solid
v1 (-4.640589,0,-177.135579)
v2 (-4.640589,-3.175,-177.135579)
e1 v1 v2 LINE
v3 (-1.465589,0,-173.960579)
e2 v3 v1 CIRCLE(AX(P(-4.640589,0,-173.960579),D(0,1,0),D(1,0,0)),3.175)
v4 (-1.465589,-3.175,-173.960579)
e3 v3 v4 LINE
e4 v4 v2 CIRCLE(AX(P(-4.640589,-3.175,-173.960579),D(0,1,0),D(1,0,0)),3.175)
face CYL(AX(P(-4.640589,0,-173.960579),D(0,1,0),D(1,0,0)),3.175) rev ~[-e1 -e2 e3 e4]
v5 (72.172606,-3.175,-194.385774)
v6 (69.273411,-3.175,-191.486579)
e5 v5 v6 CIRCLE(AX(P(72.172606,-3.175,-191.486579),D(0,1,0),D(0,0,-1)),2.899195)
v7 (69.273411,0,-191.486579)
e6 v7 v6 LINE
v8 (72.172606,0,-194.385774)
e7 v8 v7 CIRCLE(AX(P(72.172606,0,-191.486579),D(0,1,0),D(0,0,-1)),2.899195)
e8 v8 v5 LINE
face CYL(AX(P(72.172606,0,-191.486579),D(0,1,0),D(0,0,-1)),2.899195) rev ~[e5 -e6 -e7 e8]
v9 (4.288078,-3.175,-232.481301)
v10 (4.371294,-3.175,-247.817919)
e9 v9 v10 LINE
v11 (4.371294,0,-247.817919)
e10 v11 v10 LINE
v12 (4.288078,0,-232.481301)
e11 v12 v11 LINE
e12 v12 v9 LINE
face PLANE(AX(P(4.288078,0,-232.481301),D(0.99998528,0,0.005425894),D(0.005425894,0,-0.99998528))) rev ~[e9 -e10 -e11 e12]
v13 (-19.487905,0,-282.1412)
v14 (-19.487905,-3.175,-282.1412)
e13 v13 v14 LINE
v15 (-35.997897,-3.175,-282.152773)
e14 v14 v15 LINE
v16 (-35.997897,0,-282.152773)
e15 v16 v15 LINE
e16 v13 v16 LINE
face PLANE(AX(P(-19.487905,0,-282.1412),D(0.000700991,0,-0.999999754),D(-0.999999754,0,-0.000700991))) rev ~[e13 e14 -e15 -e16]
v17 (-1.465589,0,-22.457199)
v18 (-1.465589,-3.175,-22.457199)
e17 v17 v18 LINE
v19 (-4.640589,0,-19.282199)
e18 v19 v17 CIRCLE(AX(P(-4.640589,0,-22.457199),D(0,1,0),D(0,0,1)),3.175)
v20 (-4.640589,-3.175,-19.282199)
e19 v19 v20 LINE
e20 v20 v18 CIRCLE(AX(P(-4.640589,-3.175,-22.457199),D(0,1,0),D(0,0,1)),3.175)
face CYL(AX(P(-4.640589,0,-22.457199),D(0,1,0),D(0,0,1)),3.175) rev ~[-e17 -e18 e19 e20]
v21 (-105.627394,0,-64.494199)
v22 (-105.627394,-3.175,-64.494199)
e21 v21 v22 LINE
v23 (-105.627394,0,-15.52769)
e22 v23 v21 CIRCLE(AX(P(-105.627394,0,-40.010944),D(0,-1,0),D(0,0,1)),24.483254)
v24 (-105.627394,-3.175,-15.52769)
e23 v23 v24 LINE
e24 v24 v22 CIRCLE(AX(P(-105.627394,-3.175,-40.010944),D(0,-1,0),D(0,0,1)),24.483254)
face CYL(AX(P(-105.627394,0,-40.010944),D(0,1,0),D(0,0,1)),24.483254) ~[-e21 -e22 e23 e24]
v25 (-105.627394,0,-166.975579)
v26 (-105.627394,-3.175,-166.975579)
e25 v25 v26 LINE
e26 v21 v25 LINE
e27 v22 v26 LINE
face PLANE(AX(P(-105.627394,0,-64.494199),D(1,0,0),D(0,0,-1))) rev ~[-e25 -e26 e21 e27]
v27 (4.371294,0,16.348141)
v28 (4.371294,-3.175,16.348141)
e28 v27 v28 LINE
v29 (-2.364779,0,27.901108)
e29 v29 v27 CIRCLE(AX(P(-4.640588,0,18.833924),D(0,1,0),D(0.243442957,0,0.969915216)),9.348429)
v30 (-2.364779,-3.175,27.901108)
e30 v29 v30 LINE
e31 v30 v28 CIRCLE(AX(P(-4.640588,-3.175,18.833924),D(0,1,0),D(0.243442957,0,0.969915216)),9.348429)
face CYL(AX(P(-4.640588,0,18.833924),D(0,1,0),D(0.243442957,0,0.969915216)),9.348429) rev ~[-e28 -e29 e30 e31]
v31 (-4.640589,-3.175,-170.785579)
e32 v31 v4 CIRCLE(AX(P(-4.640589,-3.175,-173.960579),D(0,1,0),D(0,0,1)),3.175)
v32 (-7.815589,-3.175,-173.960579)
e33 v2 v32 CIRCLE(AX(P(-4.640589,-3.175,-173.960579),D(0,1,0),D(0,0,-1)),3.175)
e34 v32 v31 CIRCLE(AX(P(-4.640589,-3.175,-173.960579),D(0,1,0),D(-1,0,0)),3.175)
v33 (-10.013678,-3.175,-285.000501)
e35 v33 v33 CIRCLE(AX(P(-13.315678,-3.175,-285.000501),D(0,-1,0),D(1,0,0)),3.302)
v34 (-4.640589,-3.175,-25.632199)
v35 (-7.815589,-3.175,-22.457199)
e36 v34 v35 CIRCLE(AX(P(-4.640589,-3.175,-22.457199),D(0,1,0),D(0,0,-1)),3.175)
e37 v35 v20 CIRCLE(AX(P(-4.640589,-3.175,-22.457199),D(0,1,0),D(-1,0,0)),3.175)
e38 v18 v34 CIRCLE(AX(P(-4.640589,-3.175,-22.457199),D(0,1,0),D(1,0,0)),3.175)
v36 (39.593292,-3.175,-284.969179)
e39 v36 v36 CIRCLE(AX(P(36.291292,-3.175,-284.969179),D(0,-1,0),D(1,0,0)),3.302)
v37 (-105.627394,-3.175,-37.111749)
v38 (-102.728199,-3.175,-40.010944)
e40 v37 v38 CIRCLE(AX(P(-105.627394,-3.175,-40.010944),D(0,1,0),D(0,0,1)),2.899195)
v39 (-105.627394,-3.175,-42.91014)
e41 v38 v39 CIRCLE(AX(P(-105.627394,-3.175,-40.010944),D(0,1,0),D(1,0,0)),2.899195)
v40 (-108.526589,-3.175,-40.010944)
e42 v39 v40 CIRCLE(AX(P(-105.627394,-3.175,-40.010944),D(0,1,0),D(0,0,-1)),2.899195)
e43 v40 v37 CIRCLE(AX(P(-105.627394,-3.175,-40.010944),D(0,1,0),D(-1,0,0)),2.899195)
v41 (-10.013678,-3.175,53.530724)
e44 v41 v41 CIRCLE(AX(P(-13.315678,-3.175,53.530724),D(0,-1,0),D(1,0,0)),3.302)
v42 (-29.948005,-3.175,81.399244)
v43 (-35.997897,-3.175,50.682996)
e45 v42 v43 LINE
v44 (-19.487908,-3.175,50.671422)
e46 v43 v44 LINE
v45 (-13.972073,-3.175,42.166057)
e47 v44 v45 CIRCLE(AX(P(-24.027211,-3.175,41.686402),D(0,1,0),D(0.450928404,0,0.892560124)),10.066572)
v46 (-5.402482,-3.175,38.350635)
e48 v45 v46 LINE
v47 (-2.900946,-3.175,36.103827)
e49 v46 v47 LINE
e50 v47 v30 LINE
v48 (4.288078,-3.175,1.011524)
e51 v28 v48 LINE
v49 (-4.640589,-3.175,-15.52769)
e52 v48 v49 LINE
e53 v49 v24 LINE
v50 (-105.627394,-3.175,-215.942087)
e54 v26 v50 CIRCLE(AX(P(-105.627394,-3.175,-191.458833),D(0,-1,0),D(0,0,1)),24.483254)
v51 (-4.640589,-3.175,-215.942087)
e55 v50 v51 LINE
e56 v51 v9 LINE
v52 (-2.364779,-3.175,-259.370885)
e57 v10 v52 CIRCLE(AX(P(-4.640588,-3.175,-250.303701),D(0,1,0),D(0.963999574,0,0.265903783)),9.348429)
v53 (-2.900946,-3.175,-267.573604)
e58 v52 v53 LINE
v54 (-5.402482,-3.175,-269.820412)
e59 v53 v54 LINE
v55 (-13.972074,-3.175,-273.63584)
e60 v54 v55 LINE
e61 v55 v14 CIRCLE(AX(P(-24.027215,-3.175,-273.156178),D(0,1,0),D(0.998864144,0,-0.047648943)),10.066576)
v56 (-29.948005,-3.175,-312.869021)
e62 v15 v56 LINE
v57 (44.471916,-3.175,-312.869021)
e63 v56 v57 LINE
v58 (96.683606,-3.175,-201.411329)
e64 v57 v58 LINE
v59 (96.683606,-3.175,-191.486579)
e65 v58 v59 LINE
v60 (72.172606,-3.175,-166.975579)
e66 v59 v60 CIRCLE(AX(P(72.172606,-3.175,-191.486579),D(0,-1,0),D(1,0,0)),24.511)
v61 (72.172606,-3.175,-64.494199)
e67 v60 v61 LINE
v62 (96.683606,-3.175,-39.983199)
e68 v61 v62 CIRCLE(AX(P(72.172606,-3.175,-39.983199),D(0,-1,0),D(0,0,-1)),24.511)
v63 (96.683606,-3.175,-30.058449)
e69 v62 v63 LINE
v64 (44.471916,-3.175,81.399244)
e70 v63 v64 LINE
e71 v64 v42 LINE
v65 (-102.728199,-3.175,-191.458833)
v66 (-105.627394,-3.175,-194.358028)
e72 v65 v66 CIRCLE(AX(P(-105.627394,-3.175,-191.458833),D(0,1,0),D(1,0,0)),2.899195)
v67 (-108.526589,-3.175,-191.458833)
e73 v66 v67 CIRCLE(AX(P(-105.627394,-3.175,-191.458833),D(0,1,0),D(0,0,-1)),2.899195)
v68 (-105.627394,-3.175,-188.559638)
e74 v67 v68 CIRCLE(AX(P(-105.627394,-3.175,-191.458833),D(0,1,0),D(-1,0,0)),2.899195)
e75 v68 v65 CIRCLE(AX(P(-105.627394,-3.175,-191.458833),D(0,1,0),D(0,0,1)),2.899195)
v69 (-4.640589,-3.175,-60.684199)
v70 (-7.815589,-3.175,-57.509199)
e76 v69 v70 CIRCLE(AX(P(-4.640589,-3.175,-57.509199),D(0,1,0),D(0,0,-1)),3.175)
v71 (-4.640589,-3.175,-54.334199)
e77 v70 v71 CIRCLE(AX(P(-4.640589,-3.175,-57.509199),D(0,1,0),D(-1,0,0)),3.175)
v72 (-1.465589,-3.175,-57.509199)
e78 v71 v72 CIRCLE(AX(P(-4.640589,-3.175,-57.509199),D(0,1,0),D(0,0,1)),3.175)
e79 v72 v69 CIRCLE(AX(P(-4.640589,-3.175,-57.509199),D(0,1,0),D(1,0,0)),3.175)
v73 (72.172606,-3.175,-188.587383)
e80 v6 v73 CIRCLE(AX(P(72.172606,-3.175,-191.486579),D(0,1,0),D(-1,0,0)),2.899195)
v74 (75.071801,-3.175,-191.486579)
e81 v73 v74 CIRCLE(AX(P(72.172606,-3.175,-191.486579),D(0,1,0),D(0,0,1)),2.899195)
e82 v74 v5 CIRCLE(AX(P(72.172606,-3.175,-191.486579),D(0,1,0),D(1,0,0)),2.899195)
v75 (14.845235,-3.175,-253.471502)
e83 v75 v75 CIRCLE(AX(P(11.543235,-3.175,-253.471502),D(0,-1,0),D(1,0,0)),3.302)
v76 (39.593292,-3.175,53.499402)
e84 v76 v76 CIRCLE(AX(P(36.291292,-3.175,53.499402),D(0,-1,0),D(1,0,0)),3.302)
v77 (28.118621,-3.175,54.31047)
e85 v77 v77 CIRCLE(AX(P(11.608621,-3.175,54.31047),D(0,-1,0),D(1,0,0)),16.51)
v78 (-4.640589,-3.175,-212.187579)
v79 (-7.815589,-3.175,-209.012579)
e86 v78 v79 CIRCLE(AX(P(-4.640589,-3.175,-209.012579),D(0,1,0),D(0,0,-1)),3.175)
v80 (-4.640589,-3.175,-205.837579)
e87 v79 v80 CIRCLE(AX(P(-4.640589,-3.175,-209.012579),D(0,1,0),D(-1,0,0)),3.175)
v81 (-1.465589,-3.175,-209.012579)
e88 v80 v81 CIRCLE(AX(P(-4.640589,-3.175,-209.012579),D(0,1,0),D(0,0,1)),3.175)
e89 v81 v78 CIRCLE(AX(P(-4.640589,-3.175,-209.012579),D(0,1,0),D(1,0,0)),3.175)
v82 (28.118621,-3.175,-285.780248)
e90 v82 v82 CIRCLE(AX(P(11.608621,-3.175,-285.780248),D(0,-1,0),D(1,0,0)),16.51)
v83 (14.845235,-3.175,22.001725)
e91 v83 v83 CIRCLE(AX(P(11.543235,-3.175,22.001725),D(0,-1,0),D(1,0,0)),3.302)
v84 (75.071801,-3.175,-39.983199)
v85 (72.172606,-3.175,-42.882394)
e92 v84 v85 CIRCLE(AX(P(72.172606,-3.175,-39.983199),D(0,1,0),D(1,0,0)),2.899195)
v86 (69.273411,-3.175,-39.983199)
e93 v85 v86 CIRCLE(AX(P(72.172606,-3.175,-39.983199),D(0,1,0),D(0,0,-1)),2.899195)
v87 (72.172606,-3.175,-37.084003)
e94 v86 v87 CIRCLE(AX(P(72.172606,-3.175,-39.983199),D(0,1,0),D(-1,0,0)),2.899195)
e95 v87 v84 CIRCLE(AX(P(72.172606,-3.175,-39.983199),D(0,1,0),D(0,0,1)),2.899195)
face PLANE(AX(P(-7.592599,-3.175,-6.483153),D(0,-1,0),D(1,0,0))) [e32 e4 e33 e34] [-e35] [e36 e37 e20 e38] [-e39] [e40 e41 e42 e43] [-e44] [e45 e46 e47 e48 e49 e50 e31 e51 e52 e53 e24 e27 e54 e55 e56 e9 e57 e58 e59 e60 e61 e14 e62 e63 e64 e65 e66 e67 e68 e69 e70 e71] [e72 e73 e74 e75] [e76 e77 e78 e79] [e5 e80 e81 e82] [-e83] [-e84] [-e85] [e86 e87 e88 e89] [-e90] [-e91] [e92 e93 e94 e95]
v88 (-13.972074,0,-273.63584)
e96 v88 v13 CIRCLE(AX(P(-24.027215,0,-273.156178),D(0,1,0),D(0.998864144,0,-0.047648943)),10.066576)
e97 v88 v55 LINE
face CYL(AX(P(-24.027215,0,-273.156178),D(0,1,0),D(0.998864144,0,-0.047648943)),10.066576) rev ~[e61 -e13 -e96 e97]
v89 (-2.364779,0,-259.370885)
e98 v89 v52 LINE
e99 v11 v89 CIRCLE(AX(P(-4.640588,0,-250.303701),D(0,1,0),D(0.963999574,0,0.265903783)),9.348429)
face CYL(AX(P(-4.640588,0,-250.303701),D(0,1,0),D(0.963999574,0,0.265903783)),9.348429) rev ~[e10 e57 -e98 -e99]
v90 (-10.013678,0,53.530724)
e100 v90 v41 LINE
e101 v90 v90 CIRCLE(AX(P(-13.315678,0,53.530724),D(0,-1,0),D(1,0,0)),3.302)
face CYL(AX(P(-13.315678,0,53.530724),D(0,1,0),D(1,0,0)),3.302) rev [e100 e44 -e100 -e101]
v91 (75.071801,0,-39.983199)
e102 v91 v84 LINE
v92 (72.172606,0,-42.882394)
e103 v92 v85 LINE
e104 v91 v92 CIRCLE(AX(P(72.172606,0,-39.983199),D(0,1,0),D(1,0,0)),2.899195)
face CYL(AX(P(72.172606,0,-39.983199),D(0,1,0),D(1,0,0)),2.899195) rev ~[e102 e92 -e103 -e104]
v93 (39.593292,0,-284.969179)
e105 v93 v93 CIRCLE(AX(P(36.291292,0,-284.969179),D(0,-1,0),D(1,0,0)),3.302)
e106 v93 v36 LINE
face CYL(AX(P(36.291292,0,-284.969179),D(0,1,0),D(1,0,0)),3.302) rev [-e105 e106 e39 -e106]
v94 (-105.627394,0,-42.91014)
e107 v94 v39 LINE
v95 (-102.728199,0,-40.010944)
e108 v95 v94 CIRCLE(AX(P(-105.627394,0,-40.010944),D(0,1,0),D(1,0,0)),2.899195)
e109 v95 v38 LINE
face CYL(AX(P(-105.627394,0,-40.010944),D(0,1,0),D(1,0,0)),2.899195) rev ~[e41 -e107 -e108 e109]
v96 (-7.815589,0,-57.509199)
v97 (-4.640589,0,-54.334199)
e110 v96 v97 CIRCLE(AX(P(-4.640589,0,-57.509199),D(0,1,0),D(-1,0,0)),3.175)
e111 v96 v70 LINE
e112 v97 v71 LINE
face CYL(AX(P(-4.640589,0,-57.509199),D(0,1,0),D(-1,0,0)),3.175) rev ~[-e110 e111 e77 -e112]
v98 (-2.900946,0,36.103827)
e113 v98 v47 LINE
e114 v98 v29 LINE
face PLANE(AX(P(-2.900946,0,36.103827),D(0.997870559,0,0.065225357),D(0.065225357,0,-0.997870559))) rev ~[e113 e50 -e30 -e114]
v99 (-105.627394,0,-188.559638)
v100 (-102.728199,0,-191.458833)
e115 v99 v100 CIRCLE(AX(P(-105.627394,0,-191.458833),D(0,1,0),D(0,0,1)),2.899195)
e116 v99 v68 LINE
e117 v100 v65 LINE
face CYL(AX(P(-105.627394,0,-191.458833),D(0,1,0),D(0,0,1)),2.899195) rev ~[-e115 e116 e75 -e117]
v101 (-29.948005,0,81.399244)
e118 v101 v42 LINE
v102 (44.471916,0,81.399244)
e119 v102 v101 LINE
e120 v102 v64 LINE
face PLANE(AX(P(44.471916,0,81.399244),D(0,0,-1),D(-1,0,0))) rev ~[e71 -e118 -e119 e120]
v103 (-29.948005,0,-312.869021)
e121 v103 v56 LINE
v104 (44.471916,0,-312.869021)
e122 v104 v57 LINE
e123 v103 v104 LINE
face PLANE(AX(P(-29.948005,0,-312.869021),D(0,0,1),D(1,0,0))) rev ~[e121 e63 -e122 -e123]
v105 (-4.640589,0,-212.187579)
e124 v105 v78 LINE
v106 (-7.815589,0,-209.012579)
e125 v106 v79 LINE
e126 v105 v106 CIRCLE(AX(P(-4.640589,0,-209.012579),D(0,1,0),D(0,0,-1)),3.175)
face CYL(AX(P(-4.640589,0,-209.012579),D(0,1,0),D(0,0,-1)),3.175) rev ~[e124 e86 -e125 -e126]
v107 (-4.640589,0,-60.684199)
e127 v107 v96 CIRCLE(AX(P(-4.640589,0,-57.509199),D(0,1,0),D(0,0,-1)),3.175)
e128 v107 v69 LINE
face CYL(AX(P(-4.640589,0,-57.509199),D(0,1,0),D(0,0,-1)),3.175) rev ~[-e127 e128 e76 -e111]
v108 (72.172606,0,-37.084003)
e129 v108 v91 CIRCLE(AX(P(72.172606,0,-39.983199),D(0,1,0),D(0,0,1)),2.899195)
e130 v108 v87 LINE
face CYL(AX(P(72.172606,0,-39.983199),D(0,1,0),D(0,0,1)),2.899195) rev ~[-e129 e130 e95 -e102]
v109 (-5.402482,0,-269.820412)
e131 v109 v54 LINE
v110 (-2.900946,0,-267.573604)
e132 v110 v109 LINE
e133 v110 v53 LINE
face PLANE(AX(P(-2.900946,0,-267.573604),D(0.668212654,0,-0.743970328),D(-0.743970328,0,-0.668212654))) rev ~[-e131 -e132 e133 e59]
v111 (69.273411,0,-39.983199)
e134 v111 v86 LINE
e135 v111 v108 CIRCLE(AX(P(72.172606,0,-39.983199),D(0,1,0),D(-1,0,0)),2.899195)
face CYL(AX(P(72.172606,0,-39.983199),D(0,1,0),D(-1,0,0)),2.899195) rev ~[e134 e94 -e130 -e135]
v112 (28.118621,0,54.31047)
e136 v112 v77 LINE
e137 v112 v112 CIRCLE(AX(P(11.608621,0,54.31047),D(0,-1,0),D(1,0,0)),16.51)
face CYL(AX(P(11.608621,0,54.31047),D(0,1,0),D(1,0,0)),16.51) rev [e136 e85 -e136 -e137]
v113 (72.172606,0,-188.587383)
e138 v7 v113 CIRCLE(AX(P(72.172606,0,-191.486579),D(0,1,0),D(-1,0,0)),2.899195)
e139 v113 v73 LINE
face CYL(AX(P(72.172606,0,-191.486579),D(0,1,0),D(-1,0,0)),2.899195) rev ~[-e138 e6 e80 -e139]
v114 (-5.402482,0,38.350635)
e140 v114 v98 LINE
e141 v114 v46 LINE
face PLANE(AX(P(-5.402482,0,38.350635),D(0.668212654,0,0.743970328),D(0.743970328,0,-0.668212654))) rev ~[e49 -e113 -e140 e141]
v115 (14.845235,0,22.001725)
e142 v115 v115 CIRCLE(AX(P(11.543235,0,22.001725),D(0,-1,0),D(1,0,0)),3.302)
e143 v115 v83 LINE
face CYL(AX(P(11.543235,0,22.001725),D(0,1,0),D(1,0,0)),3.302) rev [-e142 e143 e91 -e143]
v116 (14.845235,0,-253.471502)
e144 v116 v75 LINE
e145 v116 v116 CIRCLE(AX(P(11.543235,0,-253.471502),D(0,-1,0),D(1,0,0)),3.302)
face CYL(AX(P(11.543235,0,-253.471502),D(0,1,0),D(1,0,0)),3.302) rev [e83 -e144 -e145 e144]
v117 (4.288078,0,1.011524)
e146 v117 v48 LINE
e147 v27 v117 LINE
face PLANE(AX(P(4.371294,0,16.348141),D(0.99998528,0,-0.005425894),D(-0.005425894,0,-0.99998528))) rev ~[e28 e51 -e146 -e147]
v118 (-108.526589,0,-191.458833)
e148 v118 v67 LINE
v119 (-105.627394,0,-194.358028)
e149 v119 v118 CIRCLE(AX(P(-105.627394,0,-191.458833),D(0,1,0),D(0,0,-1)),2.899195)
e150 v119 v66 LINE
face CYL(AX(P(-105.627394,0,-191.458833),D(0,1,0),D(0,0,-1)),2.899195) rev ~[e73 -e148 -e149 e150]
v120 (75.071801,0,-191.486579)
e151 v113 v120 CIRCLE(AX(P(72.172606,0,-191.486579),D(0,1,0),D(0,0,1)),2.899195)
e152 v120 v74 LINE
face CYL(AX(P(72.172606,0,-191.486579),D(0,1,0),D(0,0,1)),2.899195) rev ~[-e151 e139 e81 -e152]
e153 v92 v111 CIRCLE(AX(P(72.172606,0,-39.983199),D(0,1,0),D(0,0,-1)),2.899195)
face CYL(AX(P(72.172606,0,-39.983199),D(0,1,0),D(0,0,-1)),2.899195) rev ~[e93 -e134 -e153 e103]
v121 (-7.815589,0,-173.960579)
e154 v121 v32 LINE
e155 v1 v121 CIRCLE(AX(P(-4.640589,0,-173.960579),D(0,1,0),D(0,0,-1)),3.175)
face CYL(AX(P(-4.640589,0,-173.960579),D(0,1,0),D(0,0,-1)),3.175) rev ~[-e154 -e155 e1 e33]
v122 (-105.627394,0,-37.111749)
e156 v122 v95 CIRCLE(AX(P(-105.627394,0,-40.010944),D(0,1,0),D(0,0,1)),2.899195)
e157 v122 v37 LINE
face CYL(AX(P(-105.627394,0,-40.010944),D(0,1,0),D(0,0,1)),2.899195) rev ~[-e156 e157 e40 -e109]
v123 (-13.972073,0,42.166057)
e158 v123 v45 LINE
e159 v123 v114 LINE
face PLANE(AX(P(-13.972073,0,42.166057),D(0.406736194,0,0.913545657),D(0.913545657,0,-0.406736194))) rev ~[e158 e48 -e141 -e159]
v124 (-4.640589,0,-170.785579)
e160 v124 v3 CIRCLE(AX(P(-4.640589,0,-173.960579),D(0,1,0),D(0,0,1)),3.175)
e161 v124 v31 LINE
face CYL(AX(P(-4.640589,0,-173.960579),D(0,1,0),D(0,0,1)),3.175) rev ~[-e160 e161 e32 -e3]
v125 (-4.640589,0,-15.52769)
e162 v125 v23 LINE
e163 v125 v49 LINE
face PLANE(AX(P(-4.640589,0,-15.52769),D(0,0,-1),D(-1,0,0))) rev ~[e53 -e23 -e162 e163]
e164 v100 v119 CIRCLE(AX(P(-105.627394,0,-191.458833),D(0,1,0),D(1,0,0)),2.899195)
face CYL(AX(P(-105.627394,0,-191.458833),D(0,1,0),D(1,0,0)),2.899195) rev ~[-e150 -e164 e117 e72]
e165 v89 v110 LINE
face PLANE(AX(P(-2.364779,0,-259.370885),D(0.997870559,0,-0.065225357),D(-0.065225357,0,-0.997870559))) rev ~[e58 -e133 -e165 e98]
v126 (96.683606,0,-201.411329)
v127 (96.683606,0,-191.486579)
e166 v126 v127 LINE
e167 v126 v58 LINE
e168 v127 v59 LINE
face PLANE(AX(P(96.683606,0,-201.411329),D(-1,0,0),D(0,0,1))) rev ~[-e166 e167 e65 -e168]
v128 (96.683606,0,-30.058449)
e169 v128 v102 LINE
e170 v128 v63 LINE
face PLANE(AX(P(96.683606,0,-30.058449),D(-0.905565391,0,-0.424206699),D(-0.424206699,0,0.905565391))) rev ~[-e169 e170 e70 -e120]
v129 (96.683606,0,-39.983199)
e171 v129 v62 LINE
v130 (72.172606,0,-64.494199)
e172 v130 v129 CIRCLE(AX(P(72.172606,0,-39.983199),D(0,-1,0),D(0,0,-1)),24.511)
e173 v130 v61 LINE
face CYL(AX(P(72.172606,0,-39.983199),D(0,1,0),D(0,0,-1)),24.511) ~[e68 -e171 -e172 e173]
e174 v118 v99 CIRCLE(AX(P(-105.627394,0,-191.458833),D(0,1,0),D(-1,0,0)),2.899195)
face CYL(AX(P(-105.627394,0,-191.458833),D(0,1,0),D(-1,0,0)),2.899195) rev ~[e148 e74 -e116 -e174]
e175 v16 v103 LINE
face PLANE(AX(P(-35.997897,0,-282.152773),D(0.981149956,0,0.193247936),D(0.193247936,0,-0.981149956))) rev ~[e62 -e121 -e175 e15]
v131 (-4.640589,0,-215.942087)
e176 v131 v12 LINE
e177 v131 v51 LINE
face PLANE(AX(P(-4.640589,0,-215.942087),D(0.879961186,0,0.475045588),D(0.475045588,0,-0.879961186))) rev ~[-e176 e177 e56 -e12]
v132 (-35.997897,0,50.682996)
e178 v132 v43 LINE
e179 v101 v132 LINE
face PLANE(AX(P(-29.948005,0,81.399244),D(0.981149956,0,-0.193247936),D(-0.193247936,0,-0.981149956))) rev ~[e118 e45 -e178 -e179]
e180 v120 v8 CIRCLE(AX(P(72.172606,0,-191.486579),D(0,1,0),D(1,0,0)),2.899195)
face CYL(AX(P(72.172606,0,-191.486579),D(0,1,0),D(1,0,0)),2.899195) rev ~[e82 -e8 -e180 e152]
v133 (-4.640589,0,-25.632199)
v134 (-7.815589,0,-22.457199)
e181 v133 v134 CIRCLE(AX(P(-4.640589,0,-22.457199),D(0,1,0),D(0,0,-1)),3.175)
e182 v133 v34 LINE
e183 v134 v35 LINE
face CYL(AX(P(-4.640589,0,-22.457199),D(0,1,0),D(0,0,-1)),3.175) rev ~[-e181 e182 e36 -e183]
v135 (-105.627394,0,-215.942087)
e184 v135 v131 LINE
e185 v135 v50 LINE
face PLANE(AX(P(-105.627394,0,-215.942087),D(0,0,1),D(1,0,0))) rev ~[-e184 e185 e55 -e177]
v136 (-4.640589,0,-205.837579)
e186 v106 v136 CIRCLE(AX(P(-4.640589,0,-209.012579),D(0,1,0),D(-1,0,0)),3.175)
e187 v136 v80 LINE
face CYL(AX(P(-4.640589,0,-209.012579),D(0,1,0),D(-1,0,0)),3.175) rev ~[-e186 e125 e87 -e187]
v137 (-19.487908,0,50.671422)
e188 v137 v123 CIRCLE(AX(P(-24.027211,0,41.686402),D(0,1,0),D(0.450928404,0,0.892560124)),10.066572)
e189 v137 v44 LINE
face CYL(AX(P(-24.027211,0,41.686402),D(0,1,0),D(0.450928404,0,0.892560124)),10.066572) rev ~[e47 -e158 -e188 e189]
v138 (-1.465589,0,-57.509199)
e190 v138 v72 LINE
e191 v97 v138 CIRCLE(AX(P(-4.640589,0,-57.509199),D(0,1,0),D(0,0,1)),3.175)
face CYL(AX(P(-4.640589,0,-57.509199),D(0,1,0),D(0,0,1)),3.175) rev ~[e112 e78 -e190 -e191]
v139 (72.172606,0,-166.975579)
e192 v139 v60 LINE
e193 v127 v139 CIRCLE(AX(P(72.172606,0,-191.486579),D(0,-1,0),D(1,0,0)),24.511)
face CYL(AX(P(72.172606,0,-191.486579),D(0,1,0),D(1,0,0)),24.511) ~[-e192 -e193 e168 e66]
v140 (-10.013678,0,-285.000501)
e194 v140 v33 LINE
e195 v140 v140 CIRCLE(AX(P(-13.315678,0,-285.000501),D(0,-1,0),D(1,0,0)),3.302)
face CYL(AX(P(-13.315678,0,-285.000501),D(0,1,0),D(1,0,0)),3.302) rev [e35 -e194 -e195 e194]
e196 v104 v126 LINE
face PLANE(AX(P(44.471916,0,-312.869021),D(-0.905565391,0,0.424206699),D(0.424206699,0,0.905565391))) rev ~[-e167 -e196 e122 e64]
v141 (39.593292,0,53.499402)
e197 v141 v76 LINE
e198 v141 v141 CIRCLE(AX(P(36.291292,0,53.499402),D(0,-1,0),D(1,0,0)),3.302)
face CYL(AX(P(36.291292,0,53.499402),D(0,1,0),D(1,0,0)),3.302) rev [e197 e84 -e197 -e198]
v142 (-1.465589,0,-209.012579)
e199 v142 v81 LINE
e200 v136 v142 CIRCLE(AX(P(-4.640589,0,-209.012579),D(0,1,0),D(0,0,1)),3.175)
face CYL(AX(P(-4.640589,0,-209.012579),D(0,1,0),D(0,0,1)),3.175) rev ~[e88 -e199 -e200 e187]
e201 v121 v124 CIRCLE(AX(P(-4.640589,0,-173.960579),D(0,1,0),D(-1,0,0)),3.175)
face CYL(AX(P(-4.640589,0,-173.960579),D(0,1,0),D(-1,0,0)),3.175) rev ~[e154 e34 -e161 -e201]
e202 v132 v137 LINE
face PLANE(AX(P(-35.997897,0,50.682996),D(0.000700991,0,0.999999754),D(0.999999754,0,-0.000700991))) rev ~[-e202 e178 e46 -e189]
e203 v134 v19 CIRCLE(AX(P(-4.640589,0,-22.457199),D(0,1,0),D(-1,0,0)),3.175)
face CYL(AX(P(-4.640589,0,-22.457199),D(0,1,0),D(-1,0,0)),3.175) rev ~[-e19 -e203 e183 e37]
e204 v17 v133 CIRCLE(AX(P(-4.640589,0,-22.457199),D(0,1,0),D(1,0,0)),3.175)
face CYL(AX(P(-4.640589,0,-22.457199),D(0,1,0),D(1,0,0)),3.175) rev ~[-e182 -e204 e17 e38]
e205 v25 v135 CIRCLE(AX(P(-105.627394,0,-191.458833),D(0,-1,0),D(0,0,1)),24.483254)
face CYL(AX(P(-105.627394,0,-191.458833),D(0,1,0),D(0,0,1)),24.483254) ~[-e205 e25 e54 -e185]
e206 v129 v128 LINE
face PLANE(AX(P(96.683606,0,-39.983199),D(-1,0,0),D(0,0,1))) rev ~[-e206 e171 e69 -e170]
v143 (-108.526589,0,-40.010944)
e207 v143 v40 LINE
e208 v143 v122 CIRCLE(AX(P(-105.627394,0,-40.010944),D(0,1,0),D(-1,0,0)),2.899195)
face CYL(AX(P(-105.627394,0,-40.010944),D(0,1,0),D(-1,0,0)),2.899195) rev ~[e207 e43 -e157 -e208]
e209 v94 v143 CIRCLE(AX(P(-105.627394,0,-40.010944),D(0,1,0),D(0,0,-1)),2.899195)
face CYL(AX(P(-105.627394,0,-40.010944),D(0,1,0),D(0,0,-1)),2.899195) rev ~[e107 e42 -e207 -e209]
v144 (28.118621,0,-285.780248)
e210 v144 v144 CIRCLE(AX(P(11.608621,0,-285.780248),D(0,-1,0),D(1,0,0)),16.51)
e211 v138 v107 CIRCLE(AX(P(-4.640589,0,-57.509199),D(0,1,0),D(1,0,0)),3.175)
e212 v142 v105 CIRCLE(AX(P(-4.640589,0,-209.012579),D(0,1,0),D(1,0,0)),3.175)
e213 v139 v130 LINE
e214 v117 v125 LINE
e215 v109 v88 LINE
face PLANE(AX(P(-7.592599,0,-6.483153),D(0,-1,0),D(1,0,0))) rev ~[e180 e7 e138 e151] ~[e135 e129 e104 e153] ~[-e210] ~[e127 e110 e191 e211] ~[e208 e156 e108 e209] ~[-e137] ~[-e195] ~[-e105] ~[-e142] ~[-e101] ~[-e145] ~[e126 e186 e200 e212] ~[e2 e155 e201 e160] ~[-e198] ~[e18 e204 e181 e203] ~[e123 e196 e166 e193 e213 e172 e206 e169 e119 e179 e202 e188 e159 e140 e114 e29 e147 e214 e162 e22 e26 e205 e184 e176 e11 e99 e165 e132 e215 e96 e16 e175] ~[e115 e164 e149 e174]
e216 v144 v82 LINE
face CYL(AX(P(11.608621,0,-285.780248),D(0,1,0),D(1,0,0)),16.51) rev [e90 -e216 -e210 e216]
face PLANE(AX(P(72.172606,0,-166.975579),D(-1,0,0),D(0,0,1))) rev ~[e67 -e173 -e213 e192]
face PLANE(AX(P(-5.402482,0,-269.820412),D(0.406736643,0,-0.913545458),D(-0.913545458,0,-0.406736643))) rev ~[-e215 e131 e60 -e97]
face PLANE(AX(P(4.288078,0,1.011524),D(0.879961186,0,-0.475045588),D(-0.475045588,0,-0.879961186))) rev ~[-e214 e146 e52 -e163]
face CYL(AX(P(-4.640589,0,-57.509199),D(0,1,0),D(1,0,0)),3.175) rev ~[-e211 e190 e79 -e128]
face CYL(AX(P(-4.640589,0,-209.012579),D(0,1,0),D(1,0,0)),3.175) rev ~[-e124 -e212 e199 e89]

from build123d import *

# Parameters (mm, degrees)
F0_R     = 3.302
F0_R_2   = 16.51
F0_W     = 177.8
F0_H     = 77.7875
F1_DEPTH = 3.175


# Not quite as in the source:
# - ends of sketch curves that miss each other by under 0.0002 mm in the source are joined


with BuildPart() as f1:
    # F0 (on Front) → F1 (new body)
    with BuildSketch(Plane.XZ):
        with BuildLine():
            Line((-4.6405893252, -64.494198626), (72.172606051, -64.494198626))
            ThreePointArc((72.172606051, -64.494198626), (89.5045003647, -57.3150929397), (96.683606051, -39.983198626))
            Line((96.683606051, -39.983198626), (96.683606051, -30.0584486086))
            Line((96.683606051, -30.0584486086), (44.4719158113, 81.3992435336))
            Line((44.4719158113, 81.3992435336), (-29.9480052508, 81.3992435336))
            Line((-29.9480052508, 81.3992435336), (-35.9978974571, 50.6829957967))
            Line((-35.9978974571, 50.6829957967), (-19.4879078689, 50.6714224456))
            ThreePointArc((-19.4879078689, 50.6714224456), (-15.5812211009, 47.1637298884), (-13.9720730804, 42.1660573792))
            Line((-13.9720730804, 42.1660573792), (-5.4024819992, 38.3506346508))
            Line((-5.4024819992, 38.3506346508), (-2.9009456417, 36.1038269705))
            Line((-2.9009456417, 36.1038269705), (-2.3647786124, 27.9011076368))
            ThreePointArc((-2.3647786124, 27.9011076368), (3.4353485173, 23.5426794776), (4.3712937617, 16.3481414632))
            Line((4.3712937617, 16.3481414632), (4.2880776677, 1.0115236557))
            Line((4.2880776677, 1.0115236557), (-4.6405893252, -15.5276898319))
            Line((-4.6405893252, -15.5276898319), (-105.627393949, -15.5276898319))
            ThreePointArc((-105.627393949, -15.5276898319), (-130.1106483461, -40.010944229), (-105.627393949, -64.494198626))
            Line((-105.627393949, -64.494198626), (-4.6405893252, -64.494198626))
        make_face()
        with BuildLine():
            ThreePointArc((-105.627393949, -37.1117488528), (-103.5773532385, -37.9609035185), (-102.7281985728, -40.010944229))
            ThreePointArc((-102.7281985728, -40.010944229), (-103.5773532385, -42.0609849395), (-105.627393949, -42.9101396052))
            ThreePointArc((-105.627393949, -42.9101396052), (-107.6774346595, -42.0609849395), (-108.5265893252, -40.010944229))
            ThreePointArc((-108.5265893252, -40.010944229), (-107.6774346595, -37.9609035185), (-105.627393949, -37.1117488528))
        make_face(mode=Mode.SUBTRACT)
        with BuildLine():
            ThreePointArc((-4.6405893252, -54.334198626), (-2.3955252949, -55.2641345958), (-1.4655893252, -57.509198626))
            ThreePointArc((-1.4655893252, -57.509198626), (-2.3955252949, -59.7542626563), (-4.6405893252, -60.684198626))
            ThreePointArc((-4.6405893252, -60.684198626), (-6.8856533555, -59.7542626563), (-7.8155893252, -57.509198626))
            ThreePointArc((-7.8155893252, -57.509198626), (-6.8856533555, -55.2641345958), (-4.6405893252, -54.334198626))
        make_face(mode=Mode.SUBTRACT)
        with BuildLine():
            ThreePointArc((-4.6405893252, -19.282198626), (-2.3955252949, -20.2121345958), (-1.4655893252, -22.457198626))
            ThreePointArc((-1.4655893252, -22.457198626), (-2.3955252949, -24.7022626563), (-4.6405893252, -25.632198626))
            ThreePointArc((-4.6405893252, -25.632198626), (-6.8856533555, -24.7022626563), (-7.8155893252, -22.457198626))
            ThreePointArc((-7.8155893252, -22.457198626), (-6.8856533555, -20.2121345958), (-4.6405893252, -19.282198626))
        make_face(mode=Mode.SUBTRACT)
        with BuildLine():
            ThreePointArc((72.172606051, -37.0840032499), (74.2226467615, -37.9331579156), (75.0718014272, -39.983198626))
            ThreePointArc((75.0718014272, -39.983198626), (74.2226467615, -42.0332393365), (72.172606051, -42.8823940022))
            ThreePointArc((72.172606051, -42.8823940022), (70.1225653405, -42.0332393365), (69.2734106748, -39.983198626))
            ThreePointArc((69.2734106748, -39.983198626), (70.1225653405, -37.9331579156), (72.172606051, -37.0840032499))
        make_face(mode=Mode.SUBTRACT)
        with Locations((11.5432352797, 22.0017248669)):
            Circle(F0_R, mode=Mode.SUBTRACT)
        with Locations((-13.3156779021, 53.5307241817)):
            Circle(F0_R, mode=Mode.SUBTRACT)
        with Locations((11.6086210255, 54.3104703533)):
            Circle(F0_R_2, mode=Mode.SUBTRACT)
        with Locations((36.2912922688, 53.4994019413)):
            Circle(F0_R, mode=Mode.SUBTRACT)
        Polygon((72.172606051, -76.841138626), (72.172606051, -64.494198626), (-4.6405893252, -64.494198626), (-105.627393949, -64.494198626), (-105.627393949, -76.841138626), align=None)
        with Locations((-16.727393949, -115.734888626)):
            Rectangle(F0_W, F0_H)
        Polygon((72.172606051, -166.975578626), (72.172606051, -154.628638626), (-105.627393949, -154.628638626), (-105.627393949, -166.975578626), (-4.6405893252, -166.975578626), align=None)
        with BuildLine():
            ThreePointArc((96.683606051, -191.486578626), (89.5045003647, -174.1546843124), (72.172606051, -166.975578626))
            Line((72.172606051, -166.975578626), (-4.6405893252, -166.975578626))
            Line((-4.6405893252, -166.975578626), (-105.627393949, -166.975578626))
            ThreePointArc((-105.627393949, -166.975578626), (-130.1106483461, -191.4588330231), (-105.627393949, -215.9420874201))
            Line((-105.627393949, -215.9420874201), (-4.6405893252, -215.9420874201))
            Line((-4.6405893252, -215.9420874201), (4.2880776677, -232.4813009078))
            Line((4.2880776677, -232.4813009078), (4.3712937617, -247.8179187153))
            ThreePointArc((4.3712937617, -247.8179187153), (3.4353485173, -255.0124567297), (-2.3647786124, -259.3708848889))
            Line((-2.3647786124, -259.3708848889), (-2.9009456417, -267.5736042226))
            Line((-2.9009456417, -267.5736042226), (-5.4024819992, -269.8204119029))
            Line((-5.4024819992, -269.8204119029), (-13.9720735102, -273.635839865))
            ThreePointArc((-13.9720735102, -273.635839865), (-15.5812211009, -278.6335071405), (-19.487905219, -282.1411996959))
            Line((-19.487905219, -282.1411996959), (-35.9978974571, -282.1527730488))
            Line((-35.9978974571, -282.1527730488), (-29.9480052508, -312.8690207857))
            Line((-29.9480052508, -312.8690207857), (44.4719158113, -312.8690207857))
            Line((44.4719158113, -312.8690207857), (96.683606051, -201.4113286435))
            Line((96.683606051, -201.4113286435), (96.683606051, -191.486578626))
        make_face()
        with BuildLine():
            ThreePointArc((-105.627393949, -194.3580283993), (-107.6774346595, -193.5088737336), (-108.5265893252, -191.4588330231))
            ThreePointArc((-108.5265893252, -191.4588330231), (-107.6774346595, -189.4087923126), (-105.627393949, -188.5596376469))
            ThreePointArc((-105.627393949, -188.5596376469), (-103.5773532385, -189.4087923126), (-102.7281985728, -191.4588330231))
            ThreePointArc((-102.7281985728, -191.4588330231), (-103.5773532385, -193.5088737336), (-105.627393949, -194.3580283993))
        make_face(mode=Mode.SUBTRACT)
        with Locations((-13.3156779021, -285.0005014338)):
            Circle(F0_R, mode=Mode.SUBTRACT)
        with Locations((11.6086210255, -285.7802476054)):
            Circle(F0_R_2, mode=Mode.SUBTRACT)
        with Locations((36.2912922688, -284.9691791934)):
            Circle(F0_R, mode=Mode.SUBTRACT)
        with Locations((11.5432352796, -253.471502119)):
            Circle(F0_R, mode=Mode.SUBTRACT)
        with BuildLine():
            ThreePointArc((-1.4655893252, -209.012578626), (-2.3955252949, -211.2576426563), (-4.6405893252, -212.187578626))
            ThreePointArc((-4.6405893252, -212.187578626), (-6.8856533555, -211.2576426563), (-7.8155893252, -209.012578626))
            ThreePointArc((-7.8155893252, -209.012578626), (-6.8856533555, -206.7675145958), (-4.6405893252, -205.837578626))
            ThreePointArc((-4.6405893252, -205.837578626), (-2.3955252949, -206.7675145958), (-1.4655893252, -209.012578626))
        make_face(mode=Mode.SUBTRACT)
        with BuildLine():
            ThreePointArc((-1.4655893252, -173.960578626), (-2.3955252949, -176.2056426563), (-4.6405893252, -177.135578626))
            ThreePointArc((-4.6405893252, -177.135578626), (-6.8856533555, -176.2056426563), (-7.8155893252, -173.960578626))
            ThreePointArc((-7.8155893252, -173.960578626), (-6.8856533555, -171.7155145958), (-4.6405893252, -170.785578626))
            ThreePointArc((-4.6405893252, -170.785578626), (-2.3955252949, -171.7155145958), (-1.4655893252, -173.960578626))
        make_face(mode=Mode.SUBTRACT)
        with BuildLine():
            ThreePointArc((72.172606051, -194.3857740022), (70.1225653405, -193.5366193365), (69.2734106748, -191.486578626))
            ThreePointArc((69.2734106748, -191.486578626), (70.1225653405, -189.4365379156), (72.172606051, -188.5873832499))
            ThreePointArc((72.172606051, -188.5873832499), (74.2226467615, -189.4365379156), (75.0718014272, -191.486578626))
            ThreePointArc((75.0718014272, -191.486578626), (74.2226467615, -193.5366193365), (72.172606051, -194.3857740022))
        make_face(mode=Mode.SUBTRACT)
    extrude(amount=F1_DEPTH)


solid = f1.part
